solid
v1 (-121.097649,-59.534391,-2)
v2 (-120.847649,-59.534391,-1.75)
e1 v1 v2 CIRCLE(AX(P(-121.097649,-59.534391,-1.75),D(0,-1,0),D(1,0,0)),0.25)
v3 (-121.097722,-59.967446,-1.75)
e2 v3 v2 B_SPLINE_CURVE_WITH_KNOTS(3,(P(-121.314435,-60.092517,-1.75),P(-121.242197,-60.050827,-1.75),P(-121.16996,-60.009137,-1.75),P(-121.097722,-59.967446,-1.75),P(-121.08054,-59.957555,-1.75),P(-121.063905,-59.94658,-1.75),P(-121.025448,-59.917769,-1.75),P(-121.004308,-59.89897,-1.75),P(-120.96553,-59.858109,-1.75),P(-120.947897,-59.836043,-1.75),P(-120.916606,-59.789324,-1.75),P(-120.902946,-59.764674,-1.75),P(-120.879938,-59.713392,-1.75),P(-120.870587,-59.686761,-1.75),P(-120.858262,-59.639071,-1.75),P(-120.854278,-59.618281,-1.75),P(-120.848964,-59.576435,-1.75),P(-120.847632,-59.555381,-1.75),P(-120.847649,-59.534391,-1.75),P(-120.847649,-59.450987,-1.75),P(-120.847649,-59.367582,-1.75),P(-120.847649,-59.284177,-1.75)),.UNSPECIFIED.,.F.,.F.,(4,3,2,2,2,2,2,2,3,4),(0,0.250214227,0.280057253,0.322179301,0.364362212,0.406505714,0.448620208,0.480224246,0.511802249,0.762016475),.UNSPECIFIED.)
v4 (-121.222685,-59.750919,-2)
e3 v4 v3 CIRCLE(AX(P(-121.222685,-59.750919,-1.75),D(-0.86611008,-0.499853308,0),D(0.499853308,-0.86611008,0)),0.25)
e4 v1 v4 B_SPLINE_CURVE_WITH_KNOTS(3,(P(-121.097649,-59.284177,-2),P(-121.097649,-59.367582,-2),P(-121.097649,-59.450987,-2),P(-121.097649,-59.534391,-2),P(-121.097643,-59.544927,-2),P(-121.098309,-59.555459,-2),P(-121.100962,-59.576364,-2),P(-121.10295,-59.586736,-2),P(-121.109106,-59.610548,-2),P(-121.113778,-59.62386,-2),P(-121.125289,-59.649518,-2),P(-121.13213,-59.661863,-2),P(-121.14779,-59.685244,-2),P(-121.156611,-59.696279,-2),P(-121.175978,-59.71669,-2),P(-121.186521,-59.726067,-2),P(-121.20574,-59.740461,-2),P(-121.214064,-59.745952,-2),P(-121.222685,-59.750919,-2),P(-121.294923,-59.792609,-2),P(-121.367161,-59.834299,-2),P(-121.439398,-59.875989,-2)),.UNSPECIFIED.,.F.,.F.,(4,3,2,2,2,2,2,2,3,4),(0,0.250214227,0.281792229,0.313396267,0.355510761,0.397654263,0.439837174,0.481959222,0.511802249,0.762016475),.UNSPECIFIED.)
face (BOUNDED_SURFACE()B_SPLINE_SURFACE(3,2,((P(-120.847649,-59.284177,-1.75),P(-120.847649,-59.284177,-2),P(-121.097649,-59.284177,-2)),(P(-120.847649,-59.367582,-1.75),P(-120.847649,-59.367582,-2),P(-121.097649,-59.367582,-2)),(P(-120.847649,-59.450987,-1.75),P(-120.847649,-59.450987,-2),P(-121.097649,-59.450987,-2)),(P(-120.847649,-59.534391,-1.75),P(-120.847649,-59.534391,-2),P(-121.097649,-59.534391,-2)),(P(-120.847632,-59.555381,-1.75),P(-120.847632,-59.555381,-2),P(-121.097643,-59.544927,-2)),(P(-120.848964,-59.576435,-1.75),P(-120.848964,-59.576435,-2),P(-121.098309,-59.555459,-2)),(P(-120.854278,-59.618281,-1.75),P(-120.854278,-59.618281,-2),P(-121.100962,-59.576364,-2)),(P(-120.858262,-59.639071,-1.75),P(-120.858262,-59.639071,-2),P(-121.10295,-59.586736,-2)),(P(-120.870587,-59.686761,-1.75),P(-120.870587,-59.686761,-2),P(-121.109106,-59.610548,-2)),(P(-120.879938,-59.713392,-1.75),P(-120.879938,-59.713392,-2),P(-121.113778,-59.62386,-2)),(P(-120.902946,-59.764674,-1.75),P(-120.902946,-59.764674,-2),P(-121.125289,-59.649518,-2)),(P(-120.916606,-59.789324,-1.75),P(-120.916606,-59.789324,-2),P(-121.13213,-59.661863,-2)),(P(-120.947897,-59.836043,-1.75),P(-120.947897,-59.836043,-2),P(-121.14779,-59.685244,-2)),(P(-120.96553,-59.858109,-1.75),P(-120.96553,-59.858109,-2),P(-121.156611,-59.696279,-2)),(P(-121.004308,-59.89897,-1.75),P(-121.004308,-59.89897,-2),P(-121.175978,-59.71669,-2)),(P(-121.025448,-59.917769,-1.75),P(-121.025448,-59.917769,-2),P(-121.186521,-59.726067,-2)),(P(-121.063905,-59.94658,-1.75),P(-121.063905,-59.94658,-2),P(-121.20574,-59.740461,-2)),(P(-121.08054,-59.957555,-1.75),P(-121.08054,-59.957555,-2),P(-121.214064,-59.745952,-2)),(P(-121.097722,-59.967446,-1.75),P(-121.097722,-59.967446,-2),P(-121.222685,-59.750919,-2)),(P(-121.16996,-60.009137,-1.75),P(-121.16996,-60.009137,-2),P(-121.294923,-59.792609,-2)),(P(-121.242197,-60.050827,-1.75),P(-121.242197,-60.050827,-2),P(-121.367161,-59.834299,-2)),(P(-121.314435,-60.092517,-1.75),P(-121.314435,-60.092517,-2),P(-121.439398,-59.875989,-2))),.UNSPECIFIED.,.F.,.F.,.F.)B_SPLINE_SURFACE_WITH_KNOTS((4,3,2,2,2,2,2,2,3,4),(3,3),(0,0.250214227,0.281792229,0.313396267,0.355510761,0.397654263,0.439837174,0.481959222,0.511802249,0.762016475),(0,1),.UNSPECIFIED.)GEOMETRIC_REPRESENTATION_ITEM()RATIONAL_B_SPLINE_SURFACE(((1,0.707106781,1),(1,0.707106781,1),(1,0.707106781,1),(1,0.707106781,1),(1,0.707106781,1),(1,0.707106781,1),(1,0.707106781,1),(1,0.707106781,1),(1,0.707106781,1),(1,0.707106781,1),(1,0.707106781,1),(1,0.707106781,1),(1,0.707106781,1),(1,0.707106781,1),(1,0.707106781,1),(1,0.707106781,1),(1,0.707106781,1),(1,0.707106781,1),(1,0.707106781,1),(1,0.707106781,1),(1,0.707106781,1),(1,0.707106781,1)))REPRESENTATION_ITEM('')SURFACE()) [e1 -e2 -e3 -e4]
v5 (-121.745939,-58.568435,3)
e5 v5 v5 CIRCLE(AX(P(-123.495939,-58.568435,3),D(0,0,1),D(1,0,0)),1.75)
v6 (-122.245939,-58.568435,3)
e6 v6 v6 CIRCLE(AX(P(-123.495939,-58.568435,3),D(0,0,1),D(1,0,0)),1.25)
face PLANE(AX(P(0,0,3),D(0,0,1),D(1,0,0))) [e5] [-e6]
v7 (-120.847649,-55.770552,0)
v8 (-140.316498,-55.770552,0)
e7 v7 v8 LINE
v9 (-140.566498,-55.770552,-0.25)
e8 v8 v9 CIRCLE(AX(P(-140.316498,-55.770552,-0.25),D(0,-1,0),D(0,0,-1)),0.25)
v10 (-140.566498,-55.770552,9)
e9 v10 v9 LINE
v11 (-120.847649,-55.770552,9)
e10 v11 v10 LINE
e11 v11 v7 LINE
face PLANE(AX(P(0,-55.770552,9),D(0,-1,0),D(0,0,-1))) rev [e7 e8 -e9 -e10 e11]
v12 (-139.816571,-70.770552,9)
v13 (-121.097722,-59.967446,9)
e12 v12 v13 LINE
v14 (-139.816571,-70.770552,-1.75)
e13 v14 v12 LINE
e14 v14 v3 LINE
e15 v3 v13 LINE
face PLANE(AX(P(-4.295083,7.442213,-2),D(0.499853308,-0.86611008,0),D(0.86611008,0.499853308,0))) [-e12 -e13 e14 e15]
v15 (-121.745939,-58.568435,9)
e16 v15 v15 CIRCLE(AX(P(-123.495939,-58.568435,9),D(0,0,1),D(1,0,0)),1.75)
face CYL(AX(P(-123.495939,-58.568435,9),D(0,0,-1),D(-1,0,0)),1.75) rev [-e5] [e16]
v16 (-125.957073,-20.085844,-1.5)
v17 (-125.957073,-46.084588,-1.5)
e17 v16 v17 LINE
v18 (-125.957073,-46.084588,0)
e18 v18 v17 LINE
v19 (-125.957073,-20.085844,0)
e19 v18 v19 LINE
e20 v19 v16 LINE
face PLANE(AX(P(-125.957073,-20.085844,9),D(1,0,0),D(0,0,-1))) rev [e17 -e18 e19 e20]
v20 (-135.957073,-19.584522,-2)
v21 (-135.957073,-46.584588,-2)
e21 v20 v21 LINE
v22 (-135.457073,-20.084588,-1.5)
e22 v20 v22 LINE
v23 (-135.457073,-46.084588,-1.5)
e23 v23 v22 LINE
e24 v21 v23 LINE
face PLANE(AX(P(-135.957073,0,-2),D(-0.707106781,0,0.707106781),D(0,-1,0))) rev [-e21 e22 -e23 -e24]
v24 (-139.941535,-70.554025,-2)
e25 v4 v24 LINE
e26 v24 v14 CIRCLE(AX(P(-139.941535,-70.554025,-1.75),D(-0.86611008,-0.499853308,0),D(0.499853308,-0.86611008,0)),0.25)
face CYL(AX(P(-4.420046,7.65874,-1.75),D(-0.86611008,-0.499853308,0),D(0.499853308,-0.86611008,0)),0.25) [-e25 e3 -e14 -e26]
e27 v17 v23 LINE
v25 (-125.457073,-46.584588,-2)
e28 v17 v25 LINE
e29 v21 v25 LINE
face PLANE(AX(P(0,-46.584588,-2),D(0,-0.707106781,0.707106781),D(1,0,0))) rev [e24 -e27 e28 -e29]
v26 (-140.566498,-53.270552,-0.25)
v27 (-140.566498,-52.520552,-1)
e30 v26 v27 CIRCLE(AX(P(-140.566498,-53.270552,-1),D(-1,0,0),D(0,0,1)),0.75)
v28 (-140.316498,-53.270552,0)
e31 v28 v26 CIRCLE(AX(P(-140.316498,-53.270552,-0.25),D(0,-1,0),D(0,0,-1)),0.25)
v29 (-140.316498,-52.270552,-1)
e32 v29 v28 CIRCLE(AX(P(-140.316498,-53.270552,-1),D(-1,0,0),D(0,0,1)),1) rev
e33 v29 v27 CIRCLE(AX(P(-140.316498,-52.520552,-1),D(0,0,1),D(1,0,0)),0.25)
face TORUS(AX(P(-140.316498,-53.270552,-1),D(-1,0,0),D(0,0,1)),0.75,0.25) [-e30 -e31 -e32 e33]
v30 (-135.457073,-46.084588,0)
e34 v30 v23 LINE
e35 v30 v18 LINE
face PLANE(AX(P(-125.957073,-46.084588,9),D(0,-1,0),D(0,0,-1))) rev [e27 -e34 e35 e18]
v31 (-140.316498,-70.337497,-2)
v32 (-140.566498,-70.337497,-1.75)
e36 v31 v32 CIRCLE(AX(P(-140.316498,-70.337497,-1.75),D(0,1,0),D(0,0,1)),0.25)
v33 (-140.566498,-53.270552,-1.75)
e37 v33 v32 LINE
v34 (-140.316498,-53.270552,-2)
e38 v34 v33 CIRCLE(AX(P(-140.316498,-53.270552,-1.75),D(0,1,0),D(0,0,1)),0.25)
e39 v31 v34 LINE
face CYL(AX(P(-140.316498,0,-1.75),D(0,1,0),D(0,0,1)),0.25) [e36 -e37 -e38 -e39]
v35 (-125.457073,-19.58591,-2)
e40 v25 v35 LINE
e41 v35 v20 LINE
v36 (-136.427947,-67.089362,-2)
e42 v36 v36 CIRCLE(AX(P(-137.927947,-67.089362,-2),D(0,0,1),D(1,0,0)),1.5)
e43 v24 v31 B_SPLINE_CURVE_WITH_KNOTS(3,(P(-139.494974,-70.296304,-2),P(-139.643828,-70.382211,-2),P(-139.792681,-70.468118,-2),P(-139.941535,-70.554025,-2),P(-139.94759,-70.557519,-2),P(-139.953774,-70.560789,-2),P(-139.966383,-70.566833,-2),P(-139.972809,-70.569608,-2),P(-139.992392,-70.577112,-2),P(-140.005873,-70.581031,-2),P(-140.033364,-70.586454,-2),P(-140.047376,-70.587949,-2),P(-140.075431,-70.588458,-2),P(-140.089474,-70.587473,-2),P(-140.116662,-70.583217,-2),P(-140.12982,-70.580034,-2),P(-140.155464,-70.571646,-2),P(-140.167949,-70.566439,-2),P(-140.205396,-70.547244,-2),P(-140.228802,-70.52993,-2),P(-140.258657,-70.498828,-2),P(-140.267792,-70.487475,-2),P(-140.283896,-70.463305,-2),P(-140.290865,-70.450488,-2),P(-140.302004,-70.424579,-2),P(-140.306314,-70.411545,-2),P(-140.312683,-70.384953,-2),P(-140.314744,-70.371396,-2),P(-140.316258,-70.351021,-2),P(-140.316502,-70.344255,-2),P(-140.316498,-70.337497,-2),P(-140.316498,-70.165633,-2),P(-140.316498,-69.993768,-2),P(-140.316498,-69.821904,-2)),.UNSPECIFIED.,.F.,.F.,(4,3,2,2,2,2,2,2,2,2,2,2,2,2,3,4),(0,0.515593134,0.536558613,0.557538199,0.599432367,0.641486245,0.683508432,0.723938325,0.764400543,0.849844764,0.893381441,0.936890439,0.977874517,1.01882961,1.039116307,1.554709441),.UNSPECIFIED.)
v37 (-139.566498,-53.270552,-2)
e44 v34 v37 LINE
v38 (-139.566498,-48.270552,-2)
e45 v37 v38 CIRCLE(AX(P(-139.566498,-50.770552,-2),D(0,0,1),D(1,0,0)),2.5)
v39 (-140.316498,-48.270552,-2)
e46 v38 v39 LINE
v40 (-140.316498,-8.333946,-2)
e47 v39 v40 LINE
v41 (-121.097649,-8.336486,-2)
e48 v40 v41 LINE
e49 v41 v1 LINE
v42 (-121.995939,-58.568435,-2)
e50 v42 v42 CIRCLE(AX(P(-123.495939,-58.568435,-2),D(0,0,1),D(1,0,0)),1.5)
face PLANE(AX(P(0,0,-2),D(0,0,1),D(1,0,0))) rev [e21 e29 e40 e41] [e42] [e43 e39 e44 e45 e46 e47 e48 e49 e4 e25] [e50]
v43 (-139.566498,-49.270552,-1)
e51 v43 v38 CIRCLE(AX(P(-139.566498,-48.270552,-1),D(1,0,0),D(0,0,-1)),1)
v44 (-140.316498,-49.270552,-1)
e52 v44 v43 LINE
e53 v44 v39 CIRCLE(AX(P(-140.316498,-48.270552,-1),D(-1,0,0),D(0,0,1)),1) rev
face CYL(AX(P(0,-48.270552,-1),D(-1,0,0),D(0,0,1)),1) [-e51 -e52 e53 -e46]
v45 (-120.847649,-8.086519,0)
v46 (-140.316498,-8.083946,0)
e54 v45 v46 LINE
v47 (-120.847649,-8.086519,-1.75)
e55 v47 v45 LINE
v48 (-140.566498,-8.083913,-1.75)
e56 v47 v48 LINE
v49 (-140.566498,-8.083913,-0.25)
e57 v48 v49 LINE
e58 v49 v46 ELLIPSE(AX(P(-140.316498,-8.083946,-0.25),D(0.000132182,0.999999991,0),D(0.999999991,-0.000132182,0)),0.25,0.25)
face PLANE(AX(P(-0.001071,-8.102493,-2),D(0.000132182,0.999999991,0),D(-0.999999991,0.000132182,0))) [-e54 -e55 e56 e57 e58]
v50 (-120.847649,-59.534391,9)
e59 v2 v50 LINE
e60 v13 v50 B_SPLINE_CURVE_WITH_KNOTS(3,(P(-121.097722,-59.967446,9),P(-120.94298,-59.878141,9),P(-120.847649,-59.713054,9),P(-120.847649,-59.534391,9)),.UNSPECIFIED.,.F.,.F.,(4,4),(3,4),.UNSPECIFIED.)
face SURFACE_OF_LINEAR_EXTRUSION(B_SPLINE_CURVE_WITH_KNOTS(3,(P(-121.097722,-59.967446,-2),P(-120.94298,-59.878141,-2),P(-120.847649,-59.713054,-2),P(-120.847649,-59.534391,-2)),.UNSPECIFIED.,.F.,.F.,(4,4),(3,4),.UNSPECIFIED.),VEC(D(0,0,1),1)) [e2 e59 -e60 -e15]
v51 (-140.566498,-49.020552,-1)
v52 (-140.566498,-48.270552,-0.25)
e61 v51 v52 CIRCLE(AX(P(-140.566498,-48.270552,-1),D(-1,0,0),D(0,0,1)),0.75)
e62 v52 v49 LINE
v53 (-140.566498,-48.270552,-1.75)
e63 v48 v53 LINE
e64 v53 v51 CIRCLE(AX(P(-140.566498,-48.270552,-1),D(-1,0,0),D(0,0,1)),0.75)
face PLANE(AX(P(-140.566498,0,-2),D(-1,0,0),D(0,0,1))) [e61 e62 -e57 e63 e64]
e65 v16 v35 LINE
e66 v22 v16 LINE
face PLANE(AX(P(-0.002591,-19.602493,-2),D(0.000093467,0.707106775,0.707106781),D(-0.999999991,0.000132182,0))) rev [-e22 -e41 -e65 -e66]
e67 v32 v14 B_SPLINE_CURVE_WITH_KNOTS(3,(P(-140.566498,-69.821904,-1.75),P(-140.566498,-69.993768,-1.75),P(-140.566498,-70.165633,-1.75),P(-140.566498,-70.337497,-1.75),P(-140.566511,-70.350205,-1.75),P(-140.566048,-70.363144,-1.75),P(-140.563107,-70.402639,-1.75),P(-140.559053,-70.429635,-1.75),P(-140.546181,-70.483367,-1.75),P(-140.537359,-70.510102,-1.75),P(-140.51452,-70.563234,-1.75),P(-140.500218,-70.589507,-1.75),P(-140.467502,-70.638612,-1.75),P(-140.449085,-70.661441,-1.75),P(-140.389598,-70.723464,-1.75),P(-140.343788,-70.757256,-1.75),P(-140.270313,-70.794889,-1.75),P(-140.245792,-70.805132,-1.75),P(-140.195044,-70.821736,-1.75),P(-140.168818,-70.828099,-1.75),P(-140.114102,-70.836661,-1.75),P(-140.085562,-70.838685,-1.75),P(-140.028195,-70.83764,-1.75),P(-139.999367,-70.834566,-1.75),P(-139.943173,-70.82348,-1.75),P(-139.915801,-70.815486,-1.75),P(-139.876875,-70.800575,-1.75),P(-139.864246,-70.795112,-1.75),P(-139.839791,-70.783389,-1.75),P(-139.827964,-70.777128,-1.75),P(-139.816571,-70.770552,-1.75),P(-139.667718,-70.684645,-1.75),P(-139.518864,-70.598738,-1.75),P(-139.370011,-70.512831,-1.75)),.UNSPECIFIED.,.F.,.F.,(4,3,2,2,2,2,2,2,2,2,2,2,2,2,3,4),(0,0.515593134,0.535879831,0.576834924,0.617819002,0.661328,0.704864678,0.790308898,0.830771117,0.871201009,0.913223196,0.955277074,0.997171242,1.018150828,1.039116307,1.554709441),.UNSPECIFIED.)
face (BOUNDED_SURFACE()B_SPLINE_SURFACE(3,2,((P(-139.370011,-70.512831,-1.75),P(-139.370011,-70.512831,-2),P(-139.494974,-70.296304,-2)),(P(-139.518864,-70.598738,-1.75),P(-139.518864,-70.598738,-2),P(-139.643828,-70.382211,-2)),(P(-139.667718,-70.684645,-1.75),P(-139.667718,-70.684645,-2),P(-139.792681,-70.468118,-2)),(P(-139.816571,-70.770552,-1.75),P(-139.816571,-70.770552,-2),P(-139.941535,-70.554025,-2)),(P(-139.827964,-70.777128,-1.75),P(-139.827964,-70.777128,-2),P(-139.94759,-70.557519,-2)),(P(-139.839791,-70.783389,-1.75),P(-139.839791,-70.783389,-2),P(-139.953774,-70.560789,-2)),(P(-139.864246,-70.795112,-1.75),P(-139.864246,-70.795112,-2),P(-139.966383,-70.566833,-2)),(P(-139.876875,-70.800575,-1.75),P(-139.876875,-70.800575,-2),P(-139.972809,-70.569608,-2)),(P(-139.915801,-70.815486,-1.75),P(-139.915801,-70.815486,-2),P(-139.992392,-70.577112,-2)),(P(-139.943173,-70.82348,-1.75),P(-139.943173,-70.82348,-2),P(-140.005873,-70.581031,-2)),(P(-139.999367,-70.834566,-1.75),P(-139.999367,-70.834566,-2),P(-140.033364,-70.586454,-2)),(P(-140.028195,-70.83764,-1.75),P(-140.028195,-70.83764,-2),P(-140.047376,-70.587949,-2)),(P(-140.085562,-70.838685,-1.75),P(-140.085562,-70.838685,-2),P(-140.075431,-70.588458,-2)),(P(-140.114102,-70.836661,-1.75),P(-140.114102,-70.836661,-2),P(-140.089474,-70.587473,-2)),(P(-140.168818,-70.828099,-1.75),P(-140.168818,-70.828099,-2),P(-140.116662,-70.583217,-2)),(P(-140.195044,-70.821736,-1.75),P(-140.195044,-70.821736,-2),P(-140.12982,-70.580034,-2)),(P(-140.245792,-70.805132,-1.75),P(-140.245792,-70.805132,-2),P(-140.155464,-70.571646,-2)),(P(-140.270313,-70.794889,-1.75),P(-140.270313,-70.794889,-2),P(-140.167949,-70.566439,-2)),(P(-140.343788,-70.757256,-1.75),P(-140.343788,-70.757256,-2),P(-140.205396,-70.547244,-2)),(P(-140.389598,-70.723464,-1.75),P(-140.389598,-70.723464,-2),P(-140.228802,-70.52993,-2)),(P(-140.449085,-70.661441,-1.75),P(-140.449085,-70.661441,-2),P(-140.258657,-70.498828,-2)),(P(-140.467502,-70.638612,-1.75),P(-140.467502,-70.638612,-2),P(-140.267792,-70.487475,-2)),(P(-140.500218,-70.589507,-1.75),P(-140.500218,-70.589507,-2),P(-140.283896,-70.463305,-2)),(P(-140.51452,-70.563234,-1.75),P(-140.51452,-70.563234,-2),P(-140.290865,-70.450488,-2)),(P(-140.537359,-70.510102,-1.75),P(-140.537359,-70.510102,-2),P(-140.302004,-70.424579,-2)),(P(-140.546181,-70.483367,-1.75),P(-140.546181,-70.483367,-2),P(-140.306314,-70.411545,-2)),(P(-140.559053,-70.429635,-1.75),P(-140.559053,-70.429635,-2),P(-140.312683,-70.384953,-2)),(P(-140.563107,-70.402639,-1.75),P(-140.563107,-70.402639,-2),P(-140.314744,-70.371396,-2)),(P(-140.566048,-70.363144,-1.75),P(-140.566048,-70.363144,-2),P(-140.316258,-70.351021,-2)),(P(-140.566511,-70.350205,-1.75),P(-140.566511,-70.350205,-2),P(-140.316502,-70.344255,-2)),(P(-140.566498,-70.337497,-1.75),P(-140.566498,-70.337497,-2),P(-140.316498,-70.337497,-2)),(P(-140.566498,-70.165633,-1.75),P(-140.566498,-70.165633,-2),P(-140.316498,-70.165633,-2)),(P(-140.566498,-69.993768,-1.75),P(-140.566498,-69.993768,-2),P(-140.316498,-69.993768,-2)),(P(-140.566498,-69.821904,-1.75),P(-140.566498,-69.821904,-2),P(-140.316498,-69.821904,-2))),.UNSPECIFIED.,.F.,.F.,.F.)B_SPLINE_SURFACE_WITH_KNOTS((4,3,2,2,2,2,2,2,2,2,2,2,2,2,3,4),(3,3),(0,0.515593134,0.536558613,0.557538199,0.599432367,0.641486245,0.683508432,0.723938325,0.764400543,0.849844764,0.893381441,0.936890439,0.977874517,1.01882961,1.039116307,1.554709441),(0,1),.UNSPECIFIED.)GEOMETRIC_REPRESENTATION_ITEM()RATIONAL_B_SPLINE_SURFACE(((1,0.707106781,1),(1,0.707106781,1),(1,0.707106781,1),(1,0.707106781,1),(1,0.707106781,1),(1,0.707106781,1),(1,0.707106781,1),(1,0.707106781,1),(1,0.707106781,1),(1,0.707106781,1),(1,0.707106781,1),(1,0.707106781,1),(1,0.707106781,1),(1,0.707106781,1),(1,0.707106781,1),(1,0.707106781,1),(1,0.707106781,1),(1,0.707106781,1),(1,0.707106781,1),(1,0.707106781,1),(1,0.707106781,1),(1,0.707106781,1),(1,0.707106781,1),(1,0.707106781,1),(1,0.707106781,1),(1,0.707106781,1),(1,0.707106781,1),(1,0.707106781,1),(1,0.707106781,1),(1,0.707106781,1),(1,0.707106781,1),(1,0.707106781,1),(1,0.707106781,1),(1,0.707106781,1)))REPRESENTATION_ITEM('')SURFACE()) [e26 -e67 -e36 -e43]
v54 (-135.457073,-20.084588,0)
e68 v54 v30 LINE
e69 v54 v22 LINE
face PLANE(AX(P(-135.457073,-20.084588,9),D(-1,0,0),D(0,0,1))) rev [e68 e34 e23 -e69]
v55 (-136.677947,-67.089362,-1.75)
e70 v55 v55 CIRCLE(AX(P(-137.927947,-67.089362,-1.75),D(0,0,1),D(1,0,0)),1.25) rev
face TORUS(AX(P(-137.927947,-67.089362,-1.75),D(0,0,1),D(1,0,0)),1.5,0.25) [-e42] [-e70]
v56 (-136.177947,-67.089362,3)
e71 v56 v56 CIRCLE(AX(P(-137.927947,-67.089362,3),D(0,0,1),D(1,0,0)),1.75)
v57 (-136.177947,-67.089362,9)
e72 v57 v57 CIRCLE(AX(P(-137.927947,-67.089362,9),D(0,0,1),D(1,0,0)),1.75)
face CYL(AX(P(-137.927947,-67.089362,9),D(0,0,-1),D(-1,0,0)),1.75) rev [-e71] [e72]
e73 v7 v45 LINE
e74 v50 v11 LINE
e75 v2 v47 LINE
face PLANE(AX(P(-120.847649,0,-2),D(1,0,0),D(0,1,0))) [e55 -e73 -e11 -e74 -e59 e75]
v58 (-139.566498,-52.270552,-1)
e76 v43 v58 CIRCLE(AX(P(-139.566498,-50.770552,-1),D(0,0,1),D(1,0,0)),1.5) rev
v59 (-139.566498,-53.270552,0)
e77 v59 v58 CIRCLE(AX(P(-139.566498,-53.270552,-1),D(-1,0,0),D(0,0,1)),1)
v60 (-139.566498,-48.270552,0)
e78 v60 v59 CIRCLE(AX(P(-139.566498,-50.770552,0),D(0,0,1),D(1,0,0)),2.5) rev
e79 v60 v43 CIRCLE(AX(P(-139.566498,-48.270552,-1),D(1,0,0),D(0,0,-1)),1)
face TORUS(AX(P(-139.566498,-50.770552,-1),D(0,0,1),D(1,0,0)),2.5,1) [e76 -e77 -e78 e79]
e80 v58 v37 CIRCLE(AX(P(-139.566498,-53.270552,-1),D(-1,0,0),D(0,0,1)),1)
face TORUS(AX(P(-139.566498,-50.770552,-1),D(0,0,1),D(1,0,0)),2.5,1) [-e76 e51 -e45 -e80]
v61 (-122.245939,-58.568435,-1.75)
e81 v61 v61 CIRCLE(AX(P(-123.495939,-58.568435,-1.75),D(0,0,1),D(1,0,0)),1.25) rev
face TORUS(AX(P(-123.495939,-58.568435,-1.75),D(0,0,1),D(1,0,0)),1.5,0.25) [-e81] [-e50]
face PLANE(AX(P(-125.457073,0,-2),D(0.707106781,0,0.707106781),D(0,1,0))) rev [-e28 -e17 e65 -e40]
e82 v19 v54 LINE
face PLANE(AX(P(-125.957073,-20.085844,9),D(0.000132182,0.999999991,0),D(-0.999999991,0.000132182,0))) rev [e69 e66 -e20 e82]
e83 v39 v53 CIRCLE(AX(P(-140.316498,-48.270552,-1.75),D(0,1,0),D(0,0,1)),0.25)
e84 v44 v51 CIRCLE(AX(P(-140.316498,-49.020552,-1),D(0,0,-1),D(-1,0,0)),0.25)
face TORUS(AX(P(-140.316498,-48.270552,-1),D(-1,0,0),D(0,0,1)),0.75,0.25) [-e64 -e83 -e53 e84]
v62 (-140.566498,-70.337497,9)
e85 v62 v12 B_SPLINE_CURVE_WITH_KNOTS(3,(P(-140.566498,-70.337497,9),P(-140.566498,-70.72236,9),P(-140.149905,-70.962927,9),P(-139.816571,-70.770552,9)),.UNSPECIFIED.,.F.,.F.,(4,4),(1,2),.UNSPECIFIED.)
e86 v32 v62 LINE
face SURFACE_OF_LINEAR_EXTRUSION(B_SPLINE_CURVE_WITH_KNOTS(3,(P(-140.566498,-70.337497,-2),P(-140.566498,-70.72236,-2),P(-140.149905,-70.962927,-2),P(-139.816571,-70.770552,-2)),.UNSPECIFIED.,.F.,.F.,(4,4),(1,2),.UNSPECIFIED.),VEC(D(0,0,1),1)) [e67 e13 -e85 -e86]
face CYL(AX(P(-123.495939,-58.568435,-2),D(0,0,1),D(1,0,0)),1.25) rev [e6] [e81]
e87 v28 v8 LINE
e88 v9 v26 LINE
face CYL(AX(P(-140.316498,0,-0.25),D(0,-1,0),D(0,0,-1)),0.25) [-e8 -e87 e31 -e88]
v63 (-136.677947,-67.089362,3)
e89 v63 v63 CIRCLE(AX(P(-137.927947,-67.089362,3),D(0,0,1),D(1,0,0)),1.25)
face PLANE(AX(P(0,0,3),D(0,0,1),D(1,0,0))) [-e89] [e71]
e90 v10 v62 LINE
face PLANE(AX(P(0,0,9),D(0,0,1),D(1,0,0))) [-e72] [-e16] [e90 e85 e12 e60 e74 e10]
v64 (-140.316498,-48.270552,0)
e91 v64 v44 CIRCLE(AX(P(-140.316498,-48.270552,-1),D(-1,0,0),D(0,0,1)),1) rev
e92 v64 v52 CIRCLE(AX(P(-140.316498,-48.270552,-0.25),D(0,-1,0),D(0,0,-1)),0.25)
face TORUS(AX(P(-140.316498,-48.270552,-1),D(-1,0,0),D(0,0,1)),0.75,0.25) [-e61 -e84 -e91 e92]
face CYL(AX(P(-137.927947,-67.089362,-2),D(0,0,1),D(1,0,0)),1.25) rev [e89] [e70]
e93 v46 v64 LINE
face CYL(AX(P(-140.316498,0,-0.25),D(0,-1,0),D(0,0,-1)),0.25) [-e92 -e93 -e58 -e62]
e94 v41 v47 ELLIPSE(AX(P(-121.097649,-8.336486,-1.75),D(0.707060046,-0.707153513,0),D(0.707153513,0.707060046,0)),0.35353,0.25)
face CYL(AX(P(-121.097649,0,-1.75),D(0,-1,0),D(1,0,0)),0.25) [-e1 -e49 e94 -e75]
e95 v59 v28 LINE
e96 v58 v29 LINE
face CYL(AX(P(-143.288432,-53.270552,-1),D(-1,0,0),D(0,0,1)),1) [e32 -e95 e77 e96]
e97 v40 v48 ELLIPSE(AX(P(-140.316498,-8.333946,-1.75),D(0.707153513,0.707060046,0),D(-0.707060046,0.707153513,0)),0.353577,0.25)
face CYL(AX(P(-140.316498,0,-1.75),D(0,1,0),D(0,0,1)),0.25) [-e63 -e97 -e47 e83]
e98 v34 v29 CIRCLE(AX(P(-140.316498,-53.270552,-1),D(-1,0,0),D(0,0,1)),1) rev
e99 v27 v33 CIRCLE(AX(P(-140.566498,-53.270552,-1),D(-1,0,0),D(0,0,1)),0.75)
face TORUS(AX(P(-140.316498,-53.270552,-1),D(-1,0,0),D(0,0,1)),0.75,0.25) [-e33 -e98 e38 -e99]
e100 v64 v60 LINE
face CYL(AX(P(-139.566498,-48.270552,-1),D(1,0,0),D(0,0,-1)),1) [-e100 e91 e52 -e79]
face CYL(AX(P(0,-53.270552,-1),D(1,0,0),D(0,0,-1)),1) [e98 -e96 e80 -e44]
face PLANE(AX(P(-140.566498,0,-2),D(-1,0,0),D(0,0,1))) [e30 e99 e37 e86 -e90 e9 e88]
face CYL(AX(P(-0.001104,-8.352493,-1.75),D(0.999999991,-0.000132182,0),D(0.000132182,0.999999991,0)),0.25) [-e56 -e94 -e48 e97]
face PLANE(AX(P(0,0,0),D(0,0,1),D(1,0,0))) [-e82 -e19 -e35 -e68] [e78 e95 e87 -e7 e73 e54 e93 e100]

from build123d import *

# Parameters (mm, degrees)
SKETCH4_R               = 1.2500000000000113
SKETCH4_R_2             = 1.2499999999999978
BOSS_EXTRUDE4_DEPTH     = 2
SKETCH4_5_R             = 1.7500000000000104
SKETCH4_5_R_2           = 1.749999999999997
BOSS_EXTRUDE5_DEPTH     = 9
SKETCH4_6_R             = 1.749999999999997
SKETCH4_6_R_2           = 1.2499999999999978
SKETCH4_6_R_3           = 1.7500000000000104
SKETCH4_6_R_4           = 1.2500000000000113
BOSS_EXTRUDE6_DEPTH     = 3
CUT_EXTRUDE1_DEPTH      = 158.79099158717955
CUT_EXTRUDE1_DEPTH_BACK = 158.79099158717955
FILLET1_R               = 1
FILLET2_R               = 0.25
CUT_EXTRUDE2_DEPTH      = 158.79099158717955
CUT_EXTRUDE2_DEPTH_BACK = 158.79099158717955
CHAMFER1_SIZE           = 0.5


with BuildPart() as part:
    # Sketch4 → Boss-Extrude4 (new body)
    with BuildSketch(Plane.XY):
        with BuildLine():
            add(Edge.make_bspline(
                [(-121.0977219670568, -59.96744638283075), (-120.94298009720131, -59.87814106550356), (-120.8476486211035, -59.71305439455445), (-120.8476486210958, -59.53439134300407)],
                knots=[3, 3, 3, 3, 4, 4, 4, 4], degree=3))
            Line((-120.8476486210958, -59.53439134300407), (-120.8476486189429, -11.586453102615721))
            Line((-120.8476486189429, -11.58645310261572), (-120.8476486189429, -8.0865191630969))
            Line((-120.8476486189429, -8.0865191630969), (-140.5664979509455, -8.083912687906277))
            Line((-140.5664979509455, -8.083912687906277), (-140.5664979509455, -11.58397880929067))
            Line((-140.5664979509455, -11.58397880929067), (-140.5664979535839, -70.33749706476789))
            add(Edge.make_bspline(
                [(-140.5664979535839, -70.33749706476789), (-140.5664979536002, -70.72235960570497), (-140.1499046258814, -70.96292691883274), (-139.8165712997942, -70.7705521046382)],
                knots=[1, 1, 1, 1, 2, 2, 2, 2], degree=3))
            Line((-139.8165712997942, -70.7705521046382), (-121.0977219670568, -59.96744638283075))
        make_face()
        with Locations((-137.92794657478115, -67.08936245467149)):
            Circle(SKETCH4_R, mode=Mode.SUBTRACT)
        with Locations((-123.49593879557014, -58.568434854590414)):
            Circle(SKETCH4_R_2, mode=Mode.SUBTRACT)
    extrude(amount=-BOSS_EXTRUDE4_DEPTH)

    # Sketch4<5> → Boss-Extrude5 (add)
    # profile 1 of 2: a face of its own
    with BuildSketch(Plane.XY):
        Polygon((-140.56649795336358, -65.4304148764118), (-123.8285782795111, -55.7705521046382), (-140.56649795292978, -55.7705521046382), align=None)
    # profile 2 of 2: a face of its own
    with BuildSketch(Plane.XY):
        with BuildLine():
            add(Edge.make_bspline(
                [(-121.0977219670568, -59.96744638283075), (-120.94298009720131, -59.87814106550356), (-120.8476486211035, -59.71305439455445), (-120.8476486210958, -59.53439134300407)],
                knots=[3, 3, 3, 3, 4, 4, 4, 4], degree=3))
            Line((-120.8476486210958, -59.53439134300407), (-120.8476486209268, -55.7705521046382))
            Line((-120.84764862092679, -55.7705521046382), (-123.8285782795111, -55.7705521046382))
            Line((-123.8285782795111, -55.7705521046382), (-140.56649795336358, -65.4304148764118))
            Line((-140.56649795336355, -65.4304148764118), (-140.5664979535839, -70.33749706476789))
            add(Edge.make_bspline(
                [(-140.5664979535839, -70.33749706476789), (-140.5664979536002, -70.72235960570497), (-140.1499046258814, -70.96292691883274), (-139.8165712997942, -70.7705521046382)],
                knots=[1, 1, 1, 1, 2, 2, 2, 2], degree=3))
            Line((-139.8165712997942, -70.7705521046382), (-121.0977219670568, -59.96744638283075))
        make_face()
        with Locations((-137.92794657478115, -67.08936245467149)):
            Circle(SKETCH4_5_R, mode=Mode.SUBTRACT)
        with Locations((-123.49593879557014, -58.568434854590414)):
            Circle(SKETCH4_5_R_2, mode=Mode.SUBTRACT)
    extrude(amount=BOSS_EXTRUDE5_DEPTH)

    # Sketch4<6> → Boss-Extrude6 (add)
    # profile 1 of 2: a face of its own
    with BuildSketch(Plane.XY):
        with Locations((-123.49593879557014, -58.568434854590414)):
            Circle(SKETCH4_6_R)
        with Locations((-123.49593879557014, -58.568434854590414)):
            Circle(SKETCH4_6_R_2, mode=Mode.SUBTRACT)
    # profile 2 of 2: a face of its own
    with BuildSketch(Plane.XY):
        with Locations((-137.92794657478115, -67.08936245467149)):
            Circle(SKETCH4_6_R_3)
        with Locations((-137.92794657478115, -67.08936245467149)):
            Circle(SKETCH4_6_R_4, mode=Mode.SUBTRACT)
    extrude(amount=BOSS_EXTRUDE6_DEPTH)

    # Sketch8 → Cut-Extrude1 (cut, two sides: drawn at the far end of the back side and taken through both)
    with BuildSketch(Plane(origin=(0, 0, -2), x_dir=(-1, 0, 0), z_dir=(0, 0, -1)).offset(-CUT_EXTRUDE1_DEPTH_BACK)):
        with BuildLine():
            Line((139.5664979509455, -49.27055210463822), (143.2884320777397, -49.27055210463822))
            Line((143.2884320777397, -49.27055210463822), (143.2884320777397, -52.270552104638206))
            Line((143.2884320777397, -52.270552104638206), (139.5664979509455, -52.270552104638206))
            ThreePointArc((139.5664979509455, -52.270552104638206), (138.0664979509455, -50.77055210463821), (139.5664979509455, -49.27055210463822))
        make_face()
    extrude(amount=CUT_EXTRUDE1_DEPTH + CUT_EXTRUDE1_DEPTH_BACK, mode=Mode.SUBTRACT)

    # Fillet1
    fillet1_edges = [part.edges().sort_by_distance(p)[0] for p in [
        (-140.06649795193763, -52.270552104638206, 0),
        (-140.06649795227284, -52.270552104638206, -2),
        (-140.06649795193763, -49.27055210463822, 0),
        (-140.06649795227284, -49.27055210463822, -2),
        (-138.0664979509455, -50.77055210463821, 0),
        (-138.0664979509455, -50.77055210463821, -2),
    ]]
    fillet(fillet1_edges, radius=FILLET1_R - 0.0001)  # a hair under: the kernel refuses the full size

    # Fillet2
    fillet2_edges = [part.edges().sort_by_distance(p)[0] for p in [
        (-140.56649795176924, -29.927315456964447, 0),
        (-140.31653462082718, -70.7704885946968, -2),
        (-130.4571466334255, -65.36899924373448, -2),
        (-120.91465709288339, -59.78442801325112, -2),
        (-120.84764862001936, -35.56042222280989, -2),
        (-130.7070732849442, -8.08521592550159, -2),
        (-124.74593879557014, -58.568434854590414, -2),
        (-139.17794657478115, -67.08936245467149, -2),
        (-140.56649795176924, -29.927315456964447, -2),
        (-140.56649795287362, -54.5205021046382, 0),
        (-140.5664979532007, -61.80397458470304, -2),
        (-140.56649795281749, -52.56341603412977, -1.707136070508429),
        (-140.56649795281749, -52.56341603412977, -0.29286392949157103),
        (-140.56649795259295, -48.97768817514665, -1.707136070508429),
        (-140.56649795259295, -48.97768817514665, -0.2928639294915709),
    ]]
    fillet(fillet2_edges, radius=FILLET2_R)

    # Sketch9 → Cut-Extrude2 (cut, two sides: drawn at the far end of the back side and taken through both)
    with BuildSketch(Plane(origin=(0, 0, -2), x_dir=(-1, 0, 0), z_dir=(0, 0, -1)).offset(-CUT_EXTRUDE2_DEPTH_BACK)):
        Polygon((125.95707332644032, -20.085843894406473), (135.45707324344806, -20.084588166261394), (135.45707324344806, -46.08458816626139), (125.95707332644032, -46.08458816626139), align=None)
    extrude(amount=CUT_EXTRUDE2_DEPTH + CUT_EXTRUDE2_DEPTH_BACK, mode=Mode.SUBTRACT)

    # Chamfer1
    chamfer1_edges = [part.edges().sort_by_distance(p)[0] for p in [
        (-125.95707332644032, -33.08521603033393, -2),
        (-130.7070732849442, -20.08521603033393, -2),
        (-135.45707324344806, -33.08458816626139, -2),
        (-130.7070732849442, -46.08458816626139, -2),
    ]]
    chamfer(chamfer1_edges, length=CHAMFER1_SIZE)


solid = part.part
